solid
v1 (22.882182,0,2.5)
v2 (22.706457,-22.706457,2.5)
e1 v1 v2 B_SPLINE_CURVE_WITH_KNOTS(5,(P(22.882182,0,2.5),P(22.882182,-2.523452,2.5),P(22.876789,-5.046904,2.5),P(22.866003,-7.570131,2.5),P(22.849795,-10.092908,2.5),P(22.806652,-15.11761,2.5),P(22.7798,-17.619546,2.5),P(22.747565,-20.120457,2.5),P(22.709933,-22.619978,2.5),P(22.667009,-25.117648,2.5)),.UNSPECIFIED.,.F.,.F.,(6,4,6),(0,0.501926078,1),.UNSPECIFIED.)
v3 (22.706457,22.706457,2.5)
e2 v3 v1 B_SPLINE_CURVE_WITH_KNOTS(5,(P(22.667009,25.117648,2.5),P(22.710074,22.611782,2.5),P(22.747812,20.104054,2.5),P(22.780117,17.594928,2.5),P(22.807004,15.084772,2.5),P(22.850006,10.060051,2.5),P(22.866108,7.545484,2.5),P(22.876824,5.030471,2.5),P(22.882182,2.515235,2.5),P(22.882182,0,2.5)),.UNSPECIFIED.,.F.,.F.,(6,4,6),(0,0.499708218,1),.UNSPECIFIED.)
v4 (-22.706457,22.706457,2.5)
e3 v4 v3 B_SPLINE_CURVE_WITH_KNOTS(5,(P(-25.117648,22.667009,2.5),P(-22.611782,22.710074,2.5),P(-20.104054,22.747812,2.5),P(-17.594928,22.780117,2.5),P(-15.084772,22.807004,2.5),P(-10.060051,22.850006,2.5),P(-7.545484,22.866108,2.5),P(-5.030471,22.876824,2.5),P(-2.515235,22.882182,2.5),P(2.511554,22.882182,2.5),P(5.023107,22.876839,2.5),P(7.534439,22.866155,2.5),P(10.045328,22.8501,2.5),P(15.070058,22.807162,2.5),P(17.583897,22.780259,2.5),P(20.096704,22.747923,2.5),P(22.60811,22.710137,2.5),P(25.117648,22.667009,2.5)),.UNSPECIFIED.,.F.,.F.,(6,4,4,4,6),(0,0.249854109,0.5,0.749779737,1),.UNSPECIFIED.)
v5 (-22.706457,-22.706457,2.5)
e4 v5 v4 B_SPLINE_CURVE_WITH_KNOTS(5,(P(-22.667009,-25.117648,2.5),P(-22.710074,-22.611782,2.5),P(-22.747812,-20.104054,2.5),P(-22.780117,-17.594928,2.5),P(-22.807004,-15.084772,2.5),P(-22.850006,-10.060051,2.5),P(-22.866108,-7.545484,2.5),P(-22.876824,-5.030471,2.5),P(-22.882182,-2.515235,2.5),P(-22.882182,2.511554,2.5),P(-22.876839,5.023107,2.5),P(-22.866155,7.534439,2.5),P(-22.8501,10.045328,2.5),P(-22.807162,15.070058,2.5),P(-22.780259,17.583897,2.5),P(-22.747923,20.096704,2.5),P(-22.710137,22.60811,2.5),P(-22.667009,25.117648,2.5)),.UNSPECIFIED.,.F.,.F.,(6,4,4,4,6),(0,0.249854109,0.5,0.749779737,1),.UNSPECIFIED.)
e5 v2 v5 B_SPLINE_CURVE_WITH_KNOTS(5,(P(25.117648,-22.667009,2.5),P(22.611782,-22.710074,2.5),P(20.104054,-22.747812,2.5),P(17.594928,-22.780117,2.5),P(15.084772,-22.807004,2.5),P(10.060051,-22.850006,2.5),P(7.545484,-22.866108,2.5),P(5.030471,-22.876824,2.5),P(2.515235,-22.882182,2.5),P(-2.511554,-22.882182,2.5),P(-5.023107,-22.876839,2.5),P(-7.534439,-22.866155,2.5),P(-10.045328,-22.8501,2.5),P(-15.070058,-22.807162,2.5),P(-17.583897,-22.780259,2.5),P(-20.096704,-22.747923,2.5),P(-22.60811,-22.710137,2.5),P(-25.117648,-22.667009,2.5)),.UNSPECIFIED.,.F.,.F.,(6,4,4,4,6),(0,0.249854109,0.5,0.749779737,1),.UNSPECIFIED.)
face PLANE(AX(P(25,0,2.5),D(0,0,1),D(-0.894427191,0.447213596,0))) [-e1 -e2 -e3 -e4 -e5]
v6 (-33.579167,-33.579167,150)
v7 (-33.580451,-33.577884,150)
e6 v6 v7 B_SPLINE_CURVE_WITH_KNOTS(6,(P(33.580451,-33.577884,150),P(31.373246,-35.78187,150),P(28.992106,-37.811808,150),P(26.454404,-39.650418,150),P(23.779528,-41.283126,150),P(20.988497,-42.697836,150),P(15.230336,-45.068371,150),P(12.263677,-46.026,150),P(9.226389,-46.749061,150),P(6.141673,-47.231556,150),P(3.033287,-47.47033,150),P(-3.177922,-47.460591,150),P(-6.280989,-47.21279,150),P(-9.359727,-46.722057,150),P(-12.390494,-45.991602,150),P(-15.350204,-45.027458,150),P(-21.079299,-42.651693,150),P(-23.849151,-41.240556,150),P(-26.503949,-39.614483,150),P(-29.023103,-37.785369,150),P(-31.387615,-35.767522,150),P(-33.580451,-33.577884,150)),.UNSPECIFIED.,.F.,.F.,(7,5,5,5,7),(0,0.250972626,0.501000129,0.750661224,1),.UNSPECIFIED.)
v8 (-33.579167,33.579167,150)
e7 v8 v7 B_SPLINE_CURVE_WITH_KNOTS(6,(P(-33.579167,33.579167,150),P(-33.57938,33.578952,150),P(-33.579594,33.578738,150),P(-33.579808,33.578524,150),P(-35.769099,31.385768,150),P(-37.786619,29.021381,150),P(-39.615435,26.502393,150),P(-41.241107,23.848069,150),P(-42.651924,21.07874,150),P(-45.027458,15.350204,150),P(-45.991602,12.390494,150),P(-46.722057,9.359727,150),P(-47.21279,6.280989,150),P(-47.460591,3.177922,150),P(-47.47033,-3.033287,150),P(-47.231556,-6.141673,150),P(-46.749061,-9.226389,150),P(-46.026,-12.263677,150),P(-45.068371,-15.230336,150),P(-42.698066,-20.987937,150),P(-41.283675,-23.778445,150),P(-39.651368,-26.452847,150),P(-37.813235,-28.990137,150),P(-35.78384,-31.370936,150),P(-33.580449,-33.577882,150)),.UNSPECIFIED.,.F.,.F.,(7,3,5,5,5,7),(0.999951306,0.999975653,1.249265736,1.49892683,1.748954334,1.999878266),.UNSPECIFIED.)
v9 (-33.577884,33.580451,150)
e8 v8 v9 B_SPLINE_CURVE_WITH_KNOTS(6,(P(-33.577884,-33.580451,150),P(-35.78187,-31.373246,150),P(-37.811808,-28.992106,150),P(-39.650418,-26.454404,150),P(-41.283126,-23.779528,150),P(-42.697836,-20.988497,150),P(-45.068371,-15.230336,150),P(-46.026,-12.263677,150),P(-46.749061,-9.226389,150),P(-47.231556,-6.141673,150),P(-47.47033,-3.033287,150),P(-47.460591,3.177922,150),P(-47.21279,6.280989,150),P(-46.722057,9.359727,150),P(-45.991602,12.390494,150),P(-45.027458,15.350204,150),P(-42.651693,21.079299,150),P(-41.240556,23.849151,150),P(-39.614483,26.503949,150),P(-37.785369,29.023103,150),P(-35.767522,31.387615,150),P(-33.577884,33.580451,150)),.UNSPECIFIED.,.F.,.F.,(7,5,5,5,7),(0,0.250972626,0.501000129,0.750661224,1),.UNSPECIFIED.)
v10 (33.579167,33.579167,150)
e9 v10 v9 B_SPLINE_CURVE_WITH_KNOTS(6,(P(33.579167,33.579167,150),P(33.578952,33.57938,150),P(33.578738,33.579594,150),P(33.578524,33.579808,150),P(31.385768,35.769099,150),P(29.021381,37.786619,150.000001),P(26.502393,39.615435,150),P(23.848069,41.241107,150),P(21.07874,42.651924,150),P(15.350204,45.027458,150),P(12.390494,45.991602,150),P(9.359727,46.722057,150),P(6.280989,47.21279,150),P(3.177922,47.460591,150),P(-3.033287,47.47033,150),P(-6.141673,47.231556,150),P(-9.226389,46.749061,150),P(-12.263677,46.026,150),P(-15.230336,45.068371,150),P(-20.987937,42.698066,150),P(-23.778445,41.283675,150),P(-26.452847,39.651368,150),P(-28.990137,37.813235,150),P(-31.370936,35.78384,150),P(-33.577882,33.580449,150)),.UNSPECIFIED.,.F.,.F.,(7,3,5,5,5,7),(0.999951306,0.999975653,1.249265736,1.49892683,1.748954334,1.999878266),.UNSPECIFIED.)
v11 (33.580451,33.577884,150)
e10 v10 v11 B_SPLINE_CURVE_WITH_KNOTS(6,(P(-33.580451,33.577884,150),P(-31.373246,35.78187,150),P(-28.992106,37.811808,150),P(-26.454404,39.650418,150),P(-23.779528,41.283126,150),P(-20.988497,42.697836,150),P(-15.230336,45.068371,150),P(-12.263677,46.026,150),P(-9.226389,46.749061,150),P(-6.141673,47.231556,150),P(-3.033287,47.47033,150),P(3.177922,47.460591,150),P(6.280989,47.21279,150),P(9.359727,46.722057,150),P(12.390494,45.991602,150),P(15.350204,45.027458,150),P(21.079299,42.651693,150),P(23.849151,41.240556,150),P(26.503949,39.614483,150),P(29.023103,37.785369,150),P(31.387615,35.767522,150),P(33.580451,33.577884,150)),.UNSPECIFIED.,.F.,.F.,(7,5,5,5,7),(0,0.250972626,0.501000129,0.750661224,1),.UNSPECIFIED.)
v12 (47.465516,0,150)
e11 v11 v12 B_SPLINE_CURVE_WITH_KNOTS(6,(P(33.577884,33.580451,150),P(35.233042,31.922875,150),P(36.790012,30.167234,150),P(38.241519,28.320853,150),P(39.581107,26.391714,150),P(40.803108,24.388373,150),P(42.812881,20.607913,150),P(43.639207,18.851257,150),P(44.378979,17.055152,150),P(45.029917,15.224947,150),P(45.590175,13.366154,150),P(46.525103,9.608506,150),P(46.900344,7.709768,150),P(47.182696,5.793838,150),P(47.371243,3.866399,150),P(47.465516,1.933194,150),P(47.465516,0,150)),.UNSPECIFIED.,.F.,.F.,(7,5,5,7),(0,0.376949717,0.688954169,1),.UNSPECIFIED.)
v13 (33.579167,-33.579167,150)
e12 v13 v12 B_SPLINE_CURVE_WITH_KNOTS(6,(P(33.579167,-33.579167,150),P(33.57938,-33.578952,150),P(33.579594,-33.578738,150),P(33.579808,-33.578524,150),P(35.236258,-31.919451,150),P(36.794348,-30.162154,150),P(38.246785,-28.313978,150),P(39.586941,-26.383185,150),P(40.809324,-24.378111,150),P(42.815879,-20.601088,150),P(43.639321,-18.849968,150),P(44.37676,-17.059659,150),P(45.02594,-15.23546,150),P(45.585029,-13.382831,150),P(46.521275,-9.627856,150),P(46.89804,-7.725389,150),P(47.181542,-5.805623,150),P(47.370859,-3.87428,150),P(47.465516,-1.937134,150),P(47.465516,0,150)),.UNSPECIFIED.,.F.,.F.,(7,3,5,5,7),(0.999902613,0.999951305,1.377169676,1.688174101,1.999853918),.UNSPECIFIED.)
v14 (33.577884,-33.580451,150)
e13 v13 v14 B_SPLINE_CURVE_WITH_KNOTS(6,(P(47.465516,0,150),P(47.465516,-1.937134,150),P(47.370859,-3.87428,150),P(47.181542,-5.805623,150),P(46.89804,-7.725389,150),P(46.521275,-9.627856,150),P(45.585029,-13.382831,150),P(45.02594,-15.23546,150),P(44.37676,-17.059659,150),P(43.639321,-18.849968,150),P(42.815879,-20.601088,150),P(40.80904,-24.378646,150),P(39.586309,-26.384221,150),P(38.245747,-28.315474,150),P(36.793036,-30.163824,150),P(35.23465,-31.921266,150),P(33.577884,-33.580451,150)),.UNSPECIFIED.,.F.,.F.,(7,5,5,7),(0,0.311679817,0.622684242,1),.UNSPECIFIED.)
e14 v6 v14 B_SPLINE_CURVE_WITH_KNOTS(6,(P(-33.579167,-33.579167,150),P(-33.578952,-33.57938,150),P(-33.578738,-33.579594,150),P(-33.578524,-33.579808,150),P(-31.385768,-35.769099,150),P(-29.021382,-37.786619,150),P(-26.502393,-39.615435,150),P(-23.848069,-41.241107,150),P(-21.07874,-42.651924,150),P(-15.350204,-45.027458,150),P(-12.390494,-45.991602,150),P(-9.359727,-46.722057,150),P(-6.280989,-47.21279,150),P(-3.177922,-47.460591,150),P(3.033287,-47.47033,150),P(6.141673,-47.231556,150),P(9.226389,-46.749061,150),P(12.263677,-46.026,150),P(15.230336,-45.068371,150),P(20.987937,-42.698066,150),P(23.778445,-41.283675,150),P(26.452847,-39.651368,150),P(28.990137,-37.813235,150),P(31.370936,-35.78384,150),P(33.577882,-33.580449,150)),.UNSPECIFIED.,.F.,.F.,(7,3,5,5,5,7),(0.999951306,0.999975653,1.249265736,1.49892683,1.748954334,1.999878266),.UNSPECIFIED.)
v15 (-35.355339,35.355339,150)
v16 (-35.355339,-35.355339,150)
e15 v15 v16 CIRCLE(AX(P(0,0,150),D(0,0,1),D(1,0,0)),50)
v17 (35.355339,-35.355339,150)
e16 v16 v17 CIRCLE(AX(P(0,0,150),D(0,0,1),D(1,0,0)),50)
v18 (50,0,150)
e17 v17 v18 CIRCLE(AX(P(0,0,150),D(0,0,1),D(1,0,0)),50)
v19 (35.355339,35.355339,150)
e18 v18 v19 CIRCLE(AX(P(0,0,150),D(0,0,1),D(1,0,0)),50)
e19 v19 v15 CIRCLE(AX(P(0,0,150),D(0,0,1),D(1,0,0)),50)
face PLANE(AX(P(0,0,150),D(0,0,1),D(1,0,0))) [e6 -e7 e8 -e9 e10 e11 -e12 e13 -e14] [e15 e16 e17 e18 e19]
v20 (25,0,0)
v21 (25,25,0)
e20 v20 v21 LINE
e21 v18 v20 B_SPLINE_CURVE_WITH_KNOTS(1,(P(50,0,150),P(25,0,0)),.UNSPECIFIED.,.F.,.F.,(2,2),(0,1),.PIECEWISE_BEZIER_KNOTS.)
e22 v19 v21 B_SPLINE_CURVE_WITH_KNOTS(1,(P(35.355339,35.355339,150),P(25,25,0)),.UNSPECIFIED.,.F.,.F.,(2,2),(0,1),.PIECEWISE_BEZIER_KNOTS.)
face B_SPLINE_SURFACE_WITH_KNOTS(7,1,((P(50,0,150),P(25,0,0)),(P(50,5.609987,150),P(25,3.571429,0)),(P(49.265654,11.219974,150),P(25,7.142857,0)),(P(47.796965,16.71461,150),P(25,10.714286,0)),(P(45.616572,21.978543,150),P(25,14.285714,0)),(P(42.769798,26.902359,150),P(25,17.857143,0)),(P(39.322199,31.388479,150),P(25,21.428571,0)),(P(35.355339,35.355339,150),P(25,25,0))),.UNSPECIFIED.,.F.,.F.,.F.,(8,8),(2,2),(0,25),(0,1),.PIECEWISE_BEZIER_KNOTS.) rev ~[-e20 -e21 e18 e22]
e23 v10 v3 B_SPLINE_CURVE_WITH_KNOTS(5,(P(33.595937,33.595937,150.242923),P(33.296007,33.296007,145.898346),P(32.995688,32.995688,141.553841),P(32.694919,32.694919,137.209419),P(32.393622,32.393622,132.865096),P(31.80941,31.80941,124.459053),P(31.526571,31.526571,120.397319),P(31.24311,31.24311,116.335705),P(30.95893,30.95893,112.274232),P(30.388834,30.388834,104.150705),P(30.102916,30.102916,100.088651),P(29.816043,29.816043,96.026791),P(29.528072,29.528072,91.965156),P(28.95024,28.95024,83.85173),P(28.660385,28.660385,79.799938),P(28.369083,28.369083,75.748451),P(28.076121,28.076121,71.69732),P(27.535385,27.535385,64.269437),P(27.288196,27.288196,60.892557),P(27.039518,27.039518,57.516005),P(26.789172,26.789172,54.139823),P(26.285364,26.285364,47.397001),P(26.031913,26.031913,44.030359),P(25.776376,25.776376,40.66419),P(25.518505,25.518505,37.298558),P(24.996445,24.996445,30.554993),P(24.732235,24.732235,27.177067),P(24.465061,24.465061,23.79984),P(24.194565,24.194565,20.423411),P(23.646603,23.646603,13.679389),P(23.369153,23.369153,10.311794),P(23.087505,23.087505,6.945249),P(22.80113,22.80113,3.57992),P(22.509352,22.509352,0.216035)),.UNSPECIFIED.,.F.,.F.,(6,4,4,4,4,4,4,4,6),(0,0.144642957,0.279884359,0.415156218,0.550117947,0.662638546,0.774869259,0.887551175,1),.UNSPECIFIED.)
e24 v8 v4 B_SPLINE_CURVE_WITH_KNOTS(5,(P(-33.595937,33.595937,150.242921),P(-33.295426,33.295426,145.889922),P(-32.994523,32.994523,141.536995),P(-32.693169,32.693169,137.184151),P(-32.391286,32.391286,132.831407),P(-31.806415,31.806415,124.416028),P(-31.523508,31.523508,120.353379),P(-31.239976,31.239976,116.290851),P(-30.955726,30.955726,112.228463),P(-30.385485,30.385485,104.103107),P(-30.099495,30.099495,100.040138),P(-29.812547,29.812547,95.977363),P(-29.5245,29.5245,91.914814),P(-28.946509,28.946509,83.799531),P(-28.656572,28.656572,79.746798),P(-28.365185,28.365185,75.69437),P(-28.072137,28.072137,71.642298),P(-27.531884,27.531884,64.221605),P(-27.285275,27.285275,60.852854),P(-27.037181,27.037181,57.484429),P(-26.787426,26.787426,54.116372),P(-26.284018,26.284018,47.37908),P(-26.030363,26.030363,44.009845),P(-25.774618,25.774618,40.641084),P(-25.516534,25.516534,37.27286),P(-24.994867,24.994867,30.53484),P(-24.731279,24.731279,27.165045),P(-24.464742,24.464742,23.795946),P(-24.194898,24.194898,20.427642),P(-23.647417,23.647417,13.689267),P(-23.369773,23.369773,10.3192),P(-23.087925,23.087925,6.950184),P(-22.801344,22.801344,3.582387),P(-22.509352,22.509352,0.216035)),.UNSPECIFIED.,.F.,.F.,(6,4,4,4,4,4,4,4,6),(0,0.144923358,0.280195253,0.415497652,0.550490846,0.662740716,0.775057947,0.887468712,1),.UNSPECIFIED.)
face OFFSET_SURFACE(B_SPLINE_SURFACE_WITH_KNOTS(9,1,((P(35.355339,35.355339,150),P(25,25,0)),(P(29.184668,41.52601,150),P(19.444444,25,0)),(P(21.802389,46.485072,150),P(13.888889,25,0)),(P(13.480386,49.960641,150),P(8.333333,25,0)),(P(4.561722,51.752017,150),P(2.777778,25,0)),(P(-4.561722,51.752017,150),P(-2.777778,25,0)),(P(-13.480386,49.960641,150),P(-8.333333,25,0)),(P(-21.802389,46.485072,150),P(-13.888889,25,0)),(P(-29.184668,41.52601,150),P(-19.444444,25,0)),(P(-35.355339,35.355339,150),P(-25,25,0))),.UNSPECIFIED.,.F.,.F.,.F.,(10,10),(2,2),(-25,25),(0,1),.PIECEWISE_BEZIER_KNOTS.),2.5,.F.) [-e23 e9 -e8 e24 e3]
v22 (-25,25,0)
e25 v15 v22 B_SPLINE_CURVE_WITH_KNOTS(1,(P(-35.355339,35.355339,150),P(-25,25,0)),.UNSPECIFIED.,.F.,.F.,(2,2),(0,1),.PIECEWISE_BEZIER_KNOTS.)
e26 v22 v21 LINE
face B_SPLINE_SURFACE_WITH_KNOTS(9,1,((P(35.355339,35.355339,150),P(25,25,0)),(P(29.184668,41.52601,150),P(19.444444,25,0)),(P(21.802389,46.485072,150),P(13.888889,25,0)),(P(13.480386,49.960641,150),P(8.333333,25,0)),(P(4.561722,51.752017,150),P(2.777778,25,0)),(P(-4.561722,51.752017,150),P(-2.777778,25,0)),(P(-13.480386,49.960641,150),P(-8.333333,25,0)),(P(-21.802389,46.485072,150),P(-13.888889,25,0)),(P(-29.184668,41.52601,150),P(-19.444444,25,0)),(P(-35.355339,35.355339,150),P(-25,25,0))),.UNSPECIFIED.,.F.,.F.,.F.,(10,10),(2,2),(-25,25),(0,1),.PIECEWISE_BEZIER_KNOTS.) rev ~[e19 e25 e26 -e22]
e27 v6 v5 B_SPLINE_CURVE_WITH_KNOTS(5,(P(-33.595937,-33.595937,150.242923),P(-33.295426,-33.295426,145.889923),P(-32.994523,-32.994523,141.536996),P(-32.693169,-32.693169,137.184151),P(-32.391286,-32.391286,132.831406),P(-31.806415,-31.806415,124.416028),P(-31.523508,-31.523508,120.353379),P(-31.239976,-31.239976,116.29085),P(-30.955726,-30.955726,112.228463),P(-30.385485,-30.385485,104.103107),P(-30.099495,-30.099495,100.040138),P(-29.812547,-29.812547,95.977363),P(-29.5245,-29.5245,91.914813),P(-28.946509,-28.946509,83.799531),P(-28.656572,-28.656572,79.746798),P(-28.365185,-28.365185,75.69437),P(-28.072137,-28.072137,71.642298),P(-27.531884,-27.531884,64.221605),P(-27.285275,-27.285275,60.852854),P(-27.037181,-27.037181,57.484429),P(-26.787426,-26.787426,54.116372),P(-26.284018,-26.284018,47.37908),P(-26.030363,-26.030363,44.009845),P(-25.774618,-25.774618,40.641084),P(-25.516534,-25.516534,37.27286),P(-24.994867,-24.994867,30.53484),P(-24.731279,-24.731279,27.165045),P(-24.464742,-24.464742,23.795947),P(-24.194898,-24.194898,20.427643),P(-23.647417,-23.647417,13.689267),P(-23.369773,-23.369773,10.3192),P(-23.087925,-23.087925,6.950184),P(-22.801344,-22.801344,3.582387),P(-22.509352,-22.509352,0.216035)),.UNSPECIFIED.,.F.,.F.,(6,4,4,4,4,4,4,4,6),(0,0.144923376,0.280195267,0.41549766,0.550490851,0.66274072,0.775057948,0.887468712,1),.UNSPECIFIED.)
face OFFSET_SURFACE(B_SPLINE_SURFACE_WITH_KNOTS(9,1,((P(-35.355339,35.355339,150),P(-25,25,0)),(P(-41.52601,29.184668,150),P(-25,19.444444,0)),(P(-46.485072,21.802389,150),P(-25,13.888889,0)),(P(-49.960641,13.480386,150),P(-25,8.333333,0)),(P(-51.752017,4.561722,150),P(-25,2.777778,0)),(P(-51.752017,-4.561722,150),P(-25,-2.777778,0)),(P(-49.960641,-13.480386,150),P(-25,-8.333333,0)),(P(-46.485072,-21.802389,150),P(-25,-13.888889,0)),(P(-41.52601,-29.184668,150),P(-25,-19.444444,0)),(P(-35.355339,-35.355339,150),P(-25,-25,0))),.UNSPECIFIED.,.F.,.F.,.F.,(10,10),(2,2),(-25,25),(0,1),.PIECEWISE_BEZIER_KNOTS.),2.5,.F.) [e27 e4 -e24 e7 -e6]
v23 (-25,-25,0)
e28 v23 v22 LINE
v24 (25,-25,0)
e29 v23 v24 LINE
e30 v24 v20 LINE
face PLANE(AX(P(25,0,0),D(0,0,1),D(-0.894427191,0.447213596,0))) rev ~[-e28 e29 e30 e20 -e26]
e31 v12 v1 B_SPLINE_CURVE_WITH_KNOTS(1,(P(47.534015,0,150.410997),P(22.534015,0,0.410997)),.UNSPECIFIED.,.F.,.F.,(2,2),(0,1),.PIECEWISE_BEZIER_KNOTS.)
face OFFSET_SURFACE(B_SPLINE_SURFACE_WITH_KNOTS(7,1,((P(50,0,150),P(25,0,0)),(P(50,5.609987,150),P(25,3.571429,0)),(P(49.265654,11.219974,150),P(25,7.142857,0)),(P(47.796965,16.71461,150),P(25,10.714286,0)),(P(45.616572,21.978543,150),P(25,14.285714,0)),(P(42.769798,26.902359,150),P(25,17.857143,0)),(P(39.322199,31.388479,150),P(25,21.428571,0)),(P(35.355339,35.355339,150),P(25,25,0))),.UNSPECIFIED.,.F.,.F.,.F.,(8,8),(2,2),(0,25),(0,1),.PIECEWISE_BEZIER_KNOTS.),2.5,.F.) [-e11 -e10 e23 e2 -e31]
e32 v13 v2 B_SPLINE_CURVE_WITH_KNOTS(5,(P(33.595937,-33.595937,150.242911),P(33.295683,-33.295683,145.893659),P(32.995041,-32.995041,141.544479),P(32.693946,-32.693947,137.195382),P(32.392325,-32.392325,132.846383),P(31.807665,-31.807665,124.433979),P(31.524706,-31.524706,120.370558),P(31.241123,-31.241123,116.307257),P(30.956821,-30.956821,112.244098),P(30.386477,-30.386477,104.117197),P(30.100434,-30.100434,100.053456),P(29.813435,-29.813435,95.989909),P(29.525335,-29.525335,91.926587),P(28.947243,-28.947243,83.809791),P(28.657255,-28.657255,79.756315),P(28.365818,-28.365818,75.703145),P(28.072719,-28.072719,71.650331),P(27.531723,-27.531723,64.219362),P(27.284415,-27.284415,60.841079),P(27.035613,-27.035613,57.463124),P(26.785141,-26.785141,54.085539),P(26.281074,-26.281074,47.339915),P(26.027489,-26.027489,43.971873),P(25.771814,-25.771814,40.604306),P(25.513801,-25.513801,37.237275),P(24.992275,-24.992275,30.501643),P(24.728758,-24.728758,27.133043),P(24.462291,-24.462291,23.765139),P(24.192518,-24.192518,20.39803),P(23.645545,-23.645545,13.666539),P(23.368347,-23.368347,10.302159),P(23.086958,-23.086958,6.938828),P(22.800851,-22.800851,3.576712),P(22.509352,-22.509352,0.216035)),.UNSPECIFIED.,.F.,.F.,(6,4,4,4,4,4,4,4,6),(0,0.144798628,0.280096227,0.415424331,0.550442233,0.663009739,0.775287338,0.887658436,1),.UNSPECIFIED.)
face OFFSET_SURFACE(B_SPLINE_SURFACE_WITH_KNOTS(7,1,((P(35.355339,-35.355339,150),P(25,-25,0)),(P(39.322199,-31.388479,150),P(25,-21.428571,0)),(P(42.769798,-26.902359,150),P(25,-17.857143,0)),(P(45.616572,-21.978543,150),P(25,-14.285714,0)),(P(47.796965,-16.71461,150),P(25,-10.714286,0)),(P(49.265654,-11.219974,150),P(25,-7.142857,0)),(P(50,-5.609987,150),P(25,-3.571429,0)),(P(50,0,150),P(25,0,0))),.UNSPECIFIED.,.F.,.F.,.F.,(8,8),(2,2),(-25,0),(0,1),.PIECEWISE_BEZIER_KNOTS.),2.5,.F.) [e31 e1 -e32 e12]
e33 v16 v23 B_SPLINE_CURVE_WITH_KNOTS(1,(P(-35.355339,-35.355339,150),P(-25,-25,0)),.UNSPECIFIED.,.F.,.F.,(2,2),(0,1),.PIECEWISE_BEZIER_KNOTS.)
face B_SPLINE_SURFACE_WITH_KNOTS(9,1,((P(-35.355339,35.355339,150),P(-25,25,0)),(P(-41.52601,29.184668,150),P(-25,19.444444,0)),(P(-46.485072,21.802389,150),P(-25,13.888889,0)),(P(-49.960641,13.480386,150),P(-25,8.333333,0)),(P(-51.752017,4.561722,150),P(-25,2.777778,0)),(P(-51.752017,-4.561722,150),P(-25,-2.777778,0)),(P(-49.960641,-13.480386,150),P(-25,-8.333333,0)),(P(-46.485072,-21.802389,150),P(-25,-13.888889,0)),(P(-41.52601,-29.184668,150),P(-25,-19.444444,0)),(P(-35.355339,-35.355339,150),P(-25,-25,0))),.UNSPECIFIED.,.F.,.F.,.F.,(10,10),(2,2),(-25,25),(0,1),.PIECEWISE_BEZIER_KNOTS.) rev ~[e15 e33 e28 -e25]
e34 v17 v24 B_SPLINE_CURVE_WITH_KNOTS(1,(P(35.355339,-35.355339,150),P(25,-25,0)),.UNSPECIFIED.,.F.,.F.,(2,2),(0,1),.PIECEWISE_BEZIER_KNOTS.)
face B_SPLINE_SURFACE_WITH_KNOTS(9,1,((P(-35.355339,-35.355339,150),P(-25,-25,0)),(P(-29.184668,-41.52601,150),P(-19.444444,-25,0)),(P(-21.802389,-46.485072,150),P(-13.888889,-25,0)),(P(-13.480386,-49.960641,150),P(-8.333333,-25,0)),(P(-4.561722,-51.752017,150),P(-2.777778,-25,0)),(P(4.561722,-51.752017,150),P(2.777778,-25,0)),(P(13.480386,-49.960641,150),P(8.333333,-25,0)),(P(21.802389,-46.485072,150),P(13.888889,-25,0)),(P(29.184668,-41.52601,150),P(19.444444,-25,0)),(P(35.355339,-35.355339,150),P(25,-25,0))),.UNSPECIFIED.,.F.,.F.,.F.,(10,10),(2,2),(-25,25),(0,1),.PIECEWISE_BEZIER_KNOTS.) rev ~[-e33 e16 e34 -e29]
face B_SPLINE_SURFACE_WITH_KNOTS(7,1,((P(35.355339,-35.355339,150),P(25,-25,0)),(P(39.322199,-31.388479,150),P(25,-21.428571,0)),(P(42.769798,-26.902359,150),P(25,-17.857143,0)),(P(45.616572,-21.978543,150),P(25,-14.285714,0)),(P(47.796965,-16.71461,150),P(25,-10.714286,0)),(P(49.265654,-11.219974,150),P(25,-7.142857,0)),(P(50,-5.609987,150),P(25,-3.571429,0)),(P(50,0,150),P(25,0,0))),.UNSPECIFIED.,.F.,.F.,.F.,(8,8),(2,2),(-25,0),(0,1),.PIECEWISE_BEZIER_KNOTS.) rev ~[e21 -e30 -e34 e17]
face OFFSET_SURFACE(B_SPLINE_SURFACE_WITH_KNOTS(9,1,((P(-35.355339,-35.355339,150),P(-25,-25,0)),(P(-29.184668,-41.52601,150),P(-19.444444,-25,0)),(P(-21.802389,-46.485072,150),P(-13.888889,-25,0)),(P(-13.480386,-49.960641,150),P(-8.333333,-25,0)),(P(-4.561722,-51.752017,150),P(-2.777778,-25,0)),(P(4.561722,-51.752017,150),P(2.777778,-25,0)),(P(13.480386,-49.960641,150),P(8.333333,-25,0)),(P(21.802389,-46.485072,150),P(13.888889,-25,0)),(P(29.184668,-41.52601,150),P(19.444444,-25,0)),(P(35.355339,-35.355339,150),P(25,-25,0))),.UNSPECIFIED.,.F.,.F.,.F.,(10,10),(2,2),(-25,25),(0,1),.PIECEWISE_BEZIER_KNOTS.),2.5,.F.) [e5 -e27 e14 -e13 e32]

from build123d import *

# Parameters (mm, degrees)
F2_R = 50
F1_W = 50
F1_H = 50
F4_T = 2.5


# Not quite as in the source:
# - a shell that OpenCascade refuses in one call is made with other operations: the cavity is built on its own and cut out


with BuildPart() as f3:
    # F2 (on offset) → F3 section 0
    with BuildSketch(Plane.XY.offset(150)):
        Circle(F2_R)
    # F1 (on Top) → F3 section 1
    with BuildSketch(Plane.XY):
        Rectangle(F1_W, F1_H)
    loft()

    # F4: shell of thickness 2.5, made by hand


with BuildPart() as f4_core1:
    # F4_t2: copy of F3
    add(f3.part)

    # the walls: a layer under each face that stays
    f4_faces = [f4_core1.faces().sort_by_distance(p)[0] for p in [
        (35.5969883078, 15.8170858071, 75),
        (0, 37.4999999981, 75),
        (-37.4999999981, 0, 75),
        (0, -37.4999999981, 75),
        (35.5969883078, -15.8170858071, 75),
        (0, 0, 0),
    ]]
    thicken(f4_faces, amount=-F4_T, mode=Mode.SUBTRACT)


with BuildPart() as f3_1:
    add(f3.part)

    # what is left inside the walls is the cavity
    f4_cavity = [f4_core1.part.solids().sort_by_distance(p)[0] for p in [
        (-39.265085, 0, 100.949484),
    ]]
    add(f4_cavity, mode=Mode.SUBTRACT)


solid = f3_1.part
